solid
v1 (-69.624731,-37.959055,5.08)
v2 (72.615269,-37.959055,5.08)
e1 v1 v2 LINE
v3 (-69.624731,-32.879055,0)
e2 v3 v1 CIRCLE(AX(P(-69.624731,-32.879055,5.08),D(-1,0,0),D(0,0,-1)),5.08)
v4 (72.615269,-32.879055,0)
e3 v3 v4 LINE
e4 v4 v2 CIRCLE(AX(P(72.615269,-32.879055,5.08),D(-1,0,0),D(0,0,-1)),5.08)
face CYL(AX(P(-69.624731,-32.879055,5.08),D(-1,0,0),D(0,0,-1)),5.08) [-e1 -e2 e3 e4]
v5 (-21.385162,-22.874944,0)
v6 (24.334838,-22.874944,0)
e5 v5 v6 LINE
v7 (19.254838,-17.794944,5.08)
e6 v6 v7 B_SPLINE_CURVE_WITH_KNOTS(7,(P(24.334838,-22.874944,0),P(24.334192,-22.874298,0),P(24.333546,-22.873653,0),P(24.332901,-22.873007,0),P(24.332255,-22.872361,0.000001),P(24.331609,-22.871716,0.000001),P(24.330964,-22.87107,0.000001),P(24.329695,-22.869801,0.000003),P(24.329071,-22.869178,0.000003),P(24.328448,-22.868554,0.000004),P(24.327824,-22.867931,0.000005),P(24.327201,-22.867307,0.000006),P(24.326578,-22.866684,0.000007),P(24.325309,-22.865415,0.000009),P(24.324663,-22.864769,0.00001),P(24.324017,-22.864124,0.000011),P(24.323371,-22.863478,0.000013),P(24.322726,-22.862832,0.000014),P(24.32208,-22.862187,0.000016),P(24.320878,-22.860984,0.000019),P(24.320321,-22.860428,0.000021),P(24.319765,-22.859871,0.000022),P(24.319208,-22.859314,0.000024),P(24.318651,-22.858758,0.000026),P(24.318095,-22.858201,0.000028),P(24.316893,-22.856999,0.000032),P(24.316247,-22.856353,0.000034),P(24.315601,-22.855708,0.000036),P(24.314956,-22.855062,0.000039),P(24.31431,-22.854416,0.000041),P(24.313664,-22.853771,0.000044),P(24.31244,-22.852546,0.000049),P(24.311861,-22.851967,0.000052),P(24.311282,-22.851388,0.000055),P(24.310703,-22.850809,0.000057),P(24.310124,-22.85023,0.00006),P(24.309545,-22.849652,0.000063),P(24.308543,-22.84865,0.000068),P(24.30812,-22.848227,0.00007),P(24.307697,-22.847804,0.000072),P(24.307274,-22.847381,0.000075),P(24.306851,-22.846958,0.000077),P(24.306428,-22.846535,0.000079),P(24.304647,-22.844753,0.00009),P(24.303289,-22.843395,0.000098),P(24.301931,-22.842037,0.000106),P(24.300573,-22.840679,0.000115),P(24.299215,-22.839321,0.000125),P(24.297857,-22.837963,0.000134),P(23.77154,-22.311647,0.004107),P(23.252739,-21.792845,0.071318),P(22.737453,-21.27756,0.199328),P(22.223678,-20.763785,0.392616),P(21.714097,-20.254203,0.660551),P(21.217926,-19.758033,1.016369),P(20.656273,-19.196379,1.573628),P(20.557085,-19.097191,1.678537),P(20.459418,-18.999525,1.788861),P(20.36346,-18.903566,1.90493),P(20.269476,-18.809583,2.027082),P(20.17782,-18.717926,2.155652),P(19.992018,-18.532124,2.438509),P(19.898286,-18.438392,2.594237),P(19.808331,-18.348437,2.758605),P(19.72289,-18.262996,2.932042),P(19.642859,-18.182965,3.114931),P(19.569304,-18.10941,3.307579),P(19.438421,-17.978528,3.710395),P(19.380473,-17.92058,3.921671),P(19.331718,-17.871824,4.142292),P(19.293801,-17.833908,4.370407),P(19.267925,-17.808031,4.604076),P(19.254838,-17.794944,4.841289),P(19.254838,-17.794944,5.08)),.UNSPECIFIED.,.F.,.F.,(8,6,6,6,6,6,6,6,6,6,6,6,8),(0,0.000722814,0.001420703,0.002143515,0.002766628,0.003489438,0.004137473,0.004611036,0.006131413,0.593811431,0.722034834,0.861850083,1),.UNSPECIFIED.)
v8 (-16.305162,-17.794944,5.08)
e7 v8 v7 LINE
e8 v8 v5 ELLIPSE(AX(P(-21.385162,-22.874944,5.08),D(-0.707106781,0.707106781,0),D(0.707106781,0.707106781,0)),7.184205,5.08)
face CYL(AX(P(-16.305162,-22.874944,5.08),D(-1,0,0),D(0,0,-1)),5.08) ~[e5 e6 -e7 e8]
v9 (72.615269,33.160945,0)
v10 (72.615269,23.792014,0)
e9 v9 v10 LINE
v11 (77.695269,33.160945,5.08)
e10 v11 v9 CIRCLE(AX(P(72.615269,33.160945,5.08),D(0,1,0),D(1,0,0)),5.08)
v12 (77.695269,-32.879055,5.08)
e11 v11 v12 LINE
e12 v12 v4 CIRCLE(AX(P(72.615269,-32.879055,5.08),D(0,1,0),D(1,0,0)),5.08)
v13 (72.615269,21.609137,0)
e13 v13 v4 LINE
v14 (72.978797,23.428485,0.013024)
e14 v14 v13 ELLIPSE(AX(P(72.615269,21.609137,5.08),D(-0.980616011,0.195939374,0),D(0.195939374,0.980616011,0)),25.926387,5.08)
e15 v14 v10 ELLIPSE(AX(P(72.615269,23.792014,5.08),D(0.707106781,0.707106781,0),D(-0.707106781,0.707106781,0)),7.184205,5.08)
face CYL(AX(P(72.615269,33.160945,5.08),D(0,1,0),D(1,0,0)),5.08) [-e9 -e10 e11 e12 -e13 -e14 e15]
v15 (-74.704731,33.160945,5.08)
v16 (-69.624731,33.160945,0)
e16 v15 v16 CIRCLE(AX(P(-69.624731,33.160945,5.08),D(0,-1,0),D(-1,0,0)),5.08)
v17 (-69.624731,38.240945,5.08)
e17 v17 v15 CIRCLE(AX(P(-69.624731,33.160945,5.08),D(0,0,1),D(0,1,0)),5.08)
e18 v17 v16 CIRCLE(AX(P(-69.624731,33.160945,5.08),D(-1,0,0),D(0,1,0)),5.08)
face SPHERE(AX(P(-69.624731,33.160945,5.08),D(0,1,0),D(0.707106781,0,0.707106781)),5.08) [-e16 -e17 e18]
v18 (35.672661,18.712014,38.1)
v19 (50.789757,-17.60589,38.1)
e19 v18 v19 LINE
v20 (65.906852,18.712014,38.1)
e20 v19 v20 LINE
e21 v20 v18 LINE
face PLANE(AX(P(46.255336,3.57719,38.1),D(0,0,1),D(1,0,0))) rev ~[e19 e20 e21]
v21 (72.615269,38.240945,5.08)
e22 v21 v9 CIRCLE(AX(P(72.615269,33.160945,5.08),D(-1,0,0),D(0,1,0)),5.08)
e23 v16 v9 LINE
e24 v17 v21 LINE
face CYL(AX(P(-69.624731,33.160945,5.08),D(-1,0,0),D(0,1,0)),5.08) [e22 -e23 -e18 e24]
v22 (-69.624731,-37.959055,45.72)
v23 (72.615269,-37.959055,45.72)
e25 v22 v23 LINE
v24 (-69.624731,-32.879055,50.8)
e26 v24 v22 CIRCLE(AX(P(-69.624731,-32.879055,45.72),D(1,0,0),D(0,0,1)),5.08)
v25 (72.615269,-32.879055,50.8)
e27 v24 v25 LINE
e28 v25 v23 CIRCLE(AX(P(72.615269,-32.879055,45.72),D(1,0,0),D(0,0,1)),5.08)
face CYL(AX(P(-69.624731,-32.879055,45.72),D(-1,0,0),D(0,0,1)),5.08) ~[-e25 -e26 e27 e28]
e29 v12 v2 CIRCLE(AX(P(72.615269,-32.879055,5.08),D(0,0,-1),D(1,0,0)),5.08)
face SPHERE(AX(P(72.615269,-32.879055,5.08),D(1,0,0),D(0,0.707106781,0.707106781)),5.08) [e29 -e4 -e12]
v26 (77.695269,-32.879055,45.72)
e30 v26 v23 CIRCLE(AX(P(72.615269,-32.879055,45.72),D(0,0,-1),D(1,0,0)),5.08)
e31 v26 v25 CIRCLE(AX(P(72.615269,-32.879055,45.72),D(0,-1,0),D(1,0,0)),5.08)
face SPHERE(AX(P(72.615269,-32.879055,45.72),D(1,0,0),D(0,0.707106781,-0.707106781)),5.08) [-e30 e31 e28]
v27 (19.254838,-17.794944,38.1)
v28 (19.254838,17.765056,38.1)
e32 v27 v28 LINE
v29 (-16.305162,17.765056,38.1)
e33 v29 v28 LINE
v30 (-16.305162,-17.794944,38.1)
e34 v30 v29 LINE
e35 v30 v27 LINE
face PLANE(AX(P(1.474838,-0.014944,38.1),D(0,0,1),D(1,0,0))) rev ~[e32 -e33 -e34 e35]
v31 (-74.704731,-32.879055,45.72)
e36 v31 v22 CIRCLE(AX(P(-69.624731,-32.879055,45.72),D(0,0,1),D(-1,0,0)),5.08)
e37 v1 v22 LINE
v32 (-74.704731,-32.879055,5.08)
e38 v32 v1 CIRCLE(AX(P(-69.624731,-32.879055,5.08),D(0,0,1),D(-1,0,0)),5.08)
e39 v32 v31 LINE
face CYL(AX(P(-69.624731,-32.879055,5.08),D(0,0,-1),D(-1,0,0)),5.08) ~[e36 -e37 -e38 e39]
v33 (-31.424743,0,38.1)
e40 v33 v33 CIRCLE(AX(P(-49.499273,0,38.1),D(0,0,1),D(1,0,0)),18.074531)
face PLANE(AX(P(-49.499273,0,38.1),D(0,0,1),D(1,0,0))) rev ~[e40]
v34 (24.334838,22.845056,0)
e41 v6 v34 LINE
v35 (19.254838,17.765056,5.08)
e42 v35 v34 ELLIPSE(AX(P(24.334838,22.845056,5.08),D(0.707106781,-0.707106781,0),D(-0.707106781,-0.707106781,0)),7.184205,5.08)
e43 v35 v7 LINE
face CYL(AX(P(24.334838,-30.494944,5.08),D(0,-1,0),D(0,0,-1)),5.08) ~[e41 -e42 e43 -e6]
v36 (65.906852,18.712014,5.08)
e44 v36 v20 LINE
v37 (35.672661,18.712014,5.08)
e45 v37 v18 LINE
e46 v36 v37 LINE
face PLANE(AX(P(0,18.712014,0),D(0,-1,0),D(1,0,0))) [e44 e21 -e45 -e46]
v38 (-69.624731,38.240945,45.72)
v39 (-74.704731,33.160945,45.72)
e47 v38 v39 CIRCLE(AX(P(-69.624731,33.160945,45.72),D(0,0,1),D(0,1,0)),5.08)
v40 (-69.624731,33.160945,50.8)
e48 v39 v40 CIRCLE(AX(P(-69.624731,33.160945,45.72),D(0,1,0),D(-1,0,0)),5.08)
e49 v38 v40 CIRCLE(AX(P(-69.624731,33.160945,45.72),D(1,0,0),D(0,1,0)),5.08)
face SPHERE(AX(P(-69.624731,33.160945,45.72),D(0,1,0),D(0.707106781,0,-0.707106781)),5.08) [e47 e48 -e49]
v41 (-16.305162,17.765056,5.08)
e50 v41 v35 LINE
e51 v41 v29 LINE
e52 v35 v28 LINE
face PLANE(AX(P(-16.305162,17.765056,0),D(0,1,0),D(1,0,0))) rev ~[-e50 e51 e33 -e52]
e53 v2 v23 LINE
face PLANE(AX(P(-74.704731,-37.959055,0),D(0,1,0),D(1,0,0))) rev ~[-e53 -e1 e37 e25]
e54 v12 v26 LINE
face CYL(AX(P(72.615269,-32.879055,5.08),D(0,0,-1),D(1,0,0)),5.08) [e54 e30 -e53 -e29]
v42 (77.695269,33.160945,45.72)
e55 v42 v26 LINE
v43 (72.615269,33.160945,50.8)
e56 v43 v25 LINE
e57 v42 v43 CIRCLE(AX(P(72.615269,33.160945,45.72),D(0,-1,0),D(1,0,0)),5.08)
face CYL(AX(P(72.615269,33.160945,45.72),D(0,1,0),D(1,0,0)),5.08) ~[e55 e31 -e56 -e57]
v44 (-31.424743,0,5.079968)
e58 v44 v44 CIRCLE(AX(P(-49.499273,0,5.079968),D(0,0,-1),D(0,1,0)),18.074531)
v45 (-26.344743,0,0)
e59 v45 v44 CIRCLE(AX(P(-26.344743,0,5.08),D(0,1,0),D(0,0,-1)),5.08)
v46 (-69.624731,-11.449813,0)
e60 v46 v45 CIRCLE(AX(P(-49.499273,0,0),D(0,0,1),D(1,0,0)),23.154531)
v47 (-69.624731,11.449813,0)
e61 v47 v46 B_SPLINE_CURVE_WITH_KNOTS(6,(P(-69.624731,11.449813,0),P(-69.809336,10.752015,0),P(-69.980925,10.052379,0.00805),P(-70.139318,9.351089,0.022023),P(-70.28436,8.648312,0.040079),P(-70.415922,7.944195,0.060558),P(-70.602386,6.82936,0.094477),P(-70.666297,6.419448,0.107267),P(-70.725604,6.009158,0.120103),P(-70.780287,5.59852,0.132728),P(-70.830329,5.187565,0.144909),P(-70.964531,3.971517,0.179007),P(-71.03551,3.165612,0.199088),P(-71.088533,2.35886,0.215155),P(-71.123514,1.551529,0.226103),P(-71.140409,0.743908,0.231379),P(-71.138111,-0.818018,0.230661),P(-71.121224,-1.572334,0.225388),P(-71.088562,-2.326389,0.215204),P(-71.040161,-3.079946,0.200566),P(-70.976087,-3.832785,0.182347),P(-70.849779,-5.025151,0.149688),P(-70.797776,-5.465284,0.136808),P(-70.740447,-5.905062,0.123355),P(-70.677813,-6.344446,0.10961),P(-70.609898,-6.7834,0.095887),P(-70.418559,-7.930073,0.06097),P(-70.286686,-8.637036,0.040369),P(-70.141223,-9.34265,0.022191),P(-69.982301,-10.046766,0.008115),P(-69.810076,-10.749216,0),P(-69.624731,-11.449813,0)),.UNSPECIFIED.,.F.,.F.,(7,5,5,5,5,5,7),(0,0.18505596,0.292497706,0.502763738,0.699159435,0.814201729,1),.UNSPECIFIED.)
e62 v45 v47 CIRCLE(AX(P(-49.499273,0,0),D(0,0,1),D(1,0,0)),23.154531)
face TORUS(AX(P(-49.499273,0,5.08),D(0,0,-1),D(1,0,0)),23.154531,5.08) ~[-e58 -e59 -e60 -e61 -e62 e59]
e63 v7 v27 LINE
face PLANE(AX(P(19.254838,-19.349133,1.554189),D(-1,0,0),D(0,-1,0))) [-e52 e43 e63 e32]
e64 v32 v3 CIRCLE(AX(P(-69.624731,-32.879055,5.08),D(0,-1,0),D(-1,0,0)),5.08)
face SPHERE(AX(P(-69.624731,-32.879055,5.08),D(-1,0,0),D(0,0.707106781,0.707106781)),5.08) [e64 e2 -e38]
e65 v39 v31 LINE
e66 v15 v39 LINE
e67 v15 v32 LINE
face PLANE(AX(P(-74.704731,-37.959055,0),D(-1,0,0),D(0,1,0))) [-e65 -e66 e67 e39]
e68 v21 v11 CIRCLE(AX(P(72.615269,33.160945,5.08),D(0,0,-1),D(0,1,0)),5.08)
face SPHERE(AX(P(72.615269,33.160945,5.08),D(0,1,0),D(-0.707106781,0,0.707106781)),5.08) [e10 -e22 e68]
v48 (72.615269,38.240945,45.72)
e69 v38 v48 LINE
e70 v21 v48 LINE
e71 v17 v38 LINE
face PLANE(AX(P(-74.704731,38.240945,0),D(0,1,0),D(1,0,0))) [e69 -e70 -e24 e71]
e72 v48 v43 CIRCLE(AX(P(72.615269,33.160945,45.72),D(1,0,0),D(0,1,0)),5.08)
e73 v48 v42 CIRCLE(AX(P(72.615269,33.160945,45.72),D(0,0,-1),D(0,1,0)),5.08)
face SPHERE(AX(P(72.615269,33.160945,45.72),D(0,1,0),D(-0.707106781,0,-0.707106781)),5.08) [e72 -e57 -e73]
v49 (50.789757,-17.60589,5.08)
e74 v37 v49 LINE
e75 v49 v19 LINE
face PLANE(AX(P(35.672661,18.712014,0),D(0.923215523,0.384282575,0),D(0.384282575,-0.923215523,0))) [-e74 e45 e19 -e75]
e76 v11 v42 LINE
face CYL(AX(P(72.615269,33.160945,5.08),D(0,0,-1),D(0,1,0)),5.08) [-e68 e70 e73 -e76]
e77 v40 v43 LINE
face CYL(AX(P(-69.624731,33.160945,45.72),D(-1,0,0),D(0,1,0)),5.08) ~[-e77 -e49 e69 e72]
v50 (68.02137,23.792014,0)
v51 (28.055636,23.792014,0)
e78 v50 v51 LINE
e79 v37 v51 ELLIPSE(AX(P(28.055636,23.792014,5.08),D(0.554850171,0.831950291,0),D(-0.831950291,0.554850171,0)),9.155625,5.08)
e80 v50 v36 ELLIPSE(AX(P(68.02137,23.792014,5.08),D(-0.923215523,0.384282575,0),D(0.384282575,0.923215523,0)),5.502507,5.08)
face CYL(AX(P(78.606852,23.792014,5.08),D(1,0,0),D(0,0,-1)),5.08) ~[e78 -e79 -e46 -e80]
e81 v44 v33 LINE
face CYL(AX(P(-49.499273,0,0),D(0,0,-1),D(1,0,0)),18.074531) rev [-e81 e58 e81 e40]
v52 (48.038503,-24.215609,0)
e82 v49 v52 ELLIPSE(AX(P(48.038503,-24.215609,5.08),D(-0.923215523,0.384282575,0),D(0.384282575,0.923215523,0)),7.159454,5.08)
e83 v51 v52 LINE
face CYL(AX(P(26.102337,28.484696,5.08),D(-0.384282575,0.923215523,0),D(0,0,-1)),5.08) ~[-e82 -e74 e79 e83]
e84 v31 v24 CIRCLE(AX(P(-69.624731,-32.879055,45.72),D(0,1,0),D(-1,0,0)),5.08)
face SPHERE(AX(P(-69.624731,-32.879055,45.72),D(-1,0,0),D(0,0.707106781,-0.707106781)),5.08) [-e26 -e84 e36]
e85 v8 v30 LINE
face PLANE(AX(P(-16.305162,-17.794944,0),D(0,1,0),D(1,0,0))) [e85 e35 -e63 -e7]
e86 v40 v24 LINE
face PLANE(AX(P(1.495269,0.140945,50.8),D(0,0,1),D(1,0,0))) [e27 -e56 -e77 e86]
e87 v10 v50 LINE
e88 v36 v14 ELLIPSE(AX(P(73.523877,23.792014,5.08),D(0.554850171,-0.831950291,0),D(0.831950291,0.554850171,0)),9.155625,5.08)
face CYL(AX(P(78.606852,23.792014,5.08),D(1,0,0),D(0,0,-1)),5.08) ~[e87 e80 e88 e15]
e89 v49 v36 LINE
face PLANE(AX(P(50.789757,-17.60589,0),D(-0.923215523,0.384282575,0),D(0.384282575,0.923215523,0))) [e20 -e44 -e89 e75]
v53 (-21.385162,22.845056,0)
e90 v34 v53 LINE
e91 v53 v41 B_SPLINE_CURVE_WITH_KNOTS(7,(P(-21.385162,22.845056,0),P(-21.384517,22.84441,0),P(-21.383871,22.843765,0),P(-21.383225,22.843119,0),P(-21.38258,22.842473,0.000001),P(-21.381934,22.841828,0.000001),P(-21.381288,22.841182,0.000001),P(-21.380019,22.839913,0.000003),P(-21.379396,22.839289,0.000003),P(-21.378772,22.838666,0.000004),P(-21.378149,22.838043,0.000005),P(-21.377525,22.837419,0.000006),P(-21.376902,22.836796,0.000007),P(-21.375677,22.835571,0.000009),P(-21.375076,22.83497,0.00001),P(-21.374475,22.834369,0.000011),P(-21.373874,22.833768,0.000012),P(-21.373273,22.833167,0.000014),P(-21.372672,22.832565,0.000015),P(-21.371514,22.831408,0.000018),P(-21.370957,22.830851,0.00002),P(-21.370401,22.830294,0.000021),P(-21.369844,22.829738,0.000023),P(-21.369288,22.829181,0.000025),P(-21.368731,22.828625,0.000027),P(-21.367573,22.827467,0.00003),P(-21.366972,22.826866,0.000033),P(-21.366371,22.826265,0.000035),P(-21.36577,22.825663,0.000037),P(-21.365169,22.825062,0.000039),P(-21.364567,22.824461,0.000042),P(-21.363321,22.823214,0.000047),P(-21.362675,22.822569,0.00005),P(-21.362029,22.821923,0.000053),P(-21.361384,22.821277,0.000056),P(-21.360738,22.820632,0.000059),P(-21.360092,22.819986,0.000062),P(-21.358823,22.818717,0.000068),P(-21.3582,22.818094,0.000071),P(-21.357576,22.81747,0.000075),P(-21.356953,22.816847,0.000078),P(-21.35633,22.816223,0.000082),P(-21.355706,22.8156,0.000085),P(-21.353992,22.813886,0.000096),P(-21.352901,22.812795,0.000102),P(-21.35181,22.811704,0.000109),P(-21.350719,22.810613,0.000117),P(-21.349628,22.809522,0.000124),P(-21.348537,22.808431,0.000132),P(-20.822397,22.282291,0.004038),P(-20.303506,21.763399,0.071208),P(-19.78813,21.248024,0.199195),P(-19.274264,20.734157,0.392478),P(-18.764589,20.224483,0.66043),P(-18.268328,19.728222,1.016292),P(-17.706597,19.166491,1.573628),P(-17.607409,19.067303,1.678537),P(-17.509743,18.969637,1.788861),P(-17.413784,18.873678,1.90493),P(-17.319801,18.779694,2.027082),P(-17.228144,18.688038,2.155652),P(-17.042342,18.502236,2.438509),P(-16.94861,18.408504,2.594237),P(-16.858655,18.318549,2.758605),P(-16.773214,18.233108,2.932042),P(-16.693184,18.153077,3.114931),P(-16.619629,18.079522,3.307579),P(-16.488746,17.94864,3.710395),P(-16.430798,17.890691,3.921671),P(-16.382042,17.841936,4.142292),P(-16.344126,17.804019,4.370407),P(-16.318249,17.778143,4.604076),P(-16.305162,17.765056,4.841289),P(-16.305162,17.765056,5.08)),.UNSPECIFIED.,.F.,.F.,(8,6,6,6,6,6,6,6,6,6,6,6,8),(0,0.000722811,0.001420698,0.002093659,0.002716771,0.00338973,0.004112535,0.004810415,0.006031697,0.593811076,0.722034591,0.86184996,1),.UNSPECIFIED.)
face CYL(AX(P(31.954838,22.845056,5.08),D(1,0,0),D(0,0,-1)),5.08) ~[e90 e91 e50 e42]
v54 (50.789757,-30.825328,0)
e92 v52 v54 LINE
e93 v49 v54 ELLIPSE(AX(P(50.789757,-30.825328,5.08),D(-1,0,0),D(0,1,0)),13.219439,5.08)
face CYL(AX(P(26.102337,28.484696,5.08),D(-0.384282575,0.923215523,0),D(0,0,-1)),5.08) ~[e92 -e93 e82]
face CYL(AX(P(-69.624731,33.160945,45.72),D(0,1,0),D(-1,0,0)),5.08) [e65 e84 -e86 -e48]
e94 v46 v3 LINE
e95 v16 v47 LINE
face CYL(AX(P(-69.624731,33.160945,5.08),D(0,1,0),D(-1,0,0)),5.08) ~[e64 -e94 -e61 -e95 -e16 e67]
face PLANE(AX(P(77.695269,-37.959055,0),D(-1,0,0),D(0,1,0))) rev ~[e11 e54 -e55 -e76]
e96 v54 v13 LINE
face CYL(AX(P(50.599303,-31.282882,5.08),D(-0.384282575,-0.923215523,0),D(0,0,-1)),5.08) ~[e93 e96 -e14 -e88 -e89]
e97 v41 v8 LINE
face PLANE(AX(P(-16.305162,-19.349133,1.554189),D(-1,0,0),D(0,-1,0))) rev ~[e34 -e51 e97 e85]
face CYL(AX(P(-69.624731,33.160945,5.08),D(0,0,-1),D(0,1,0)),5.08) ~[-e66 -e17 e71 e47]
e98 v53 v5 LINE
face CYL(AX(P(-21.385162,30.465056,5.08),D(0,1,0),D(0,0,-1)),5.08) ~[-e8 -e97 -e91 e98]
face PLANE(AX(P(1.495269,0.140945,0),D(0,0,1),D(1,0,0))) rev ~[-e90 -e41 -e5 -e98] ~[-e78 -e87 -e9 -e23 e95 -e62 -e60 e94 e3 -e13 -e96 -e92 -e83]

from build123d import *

# Parameters (mm, degrees)
F0_W          = 152.4
F0_H          = 76.2
F1_DEPTH      = 50.8
F2_R          = 18.0745305817
F3_DEPTH      = 38.1
F6_DEPTH      = 38.1
F4_W          = 35.56
F4_H          = 35.56
F7_DEPTH      = 38.1
F8_T1_DEPTH   = 35.56
F8_T3_DEPTH   = 35.56
F8_T5_DEPTH   = 142.24
F8_T7_DEPTH   = 66.04
F8_T9_DEPTH   = 40.64
F8_S13_W      = 5.08
F8_S13_H      = 5.08
F8_T14_DEPTH  = 5.08
F8_S19_W      = 5.08
F8_S19_H      = 5.08
F8_T20_DEPTH  = 5.08
F8_S25_W      = 5.08
F8_S25_H      = 5.08
F8_T26_DEPTH  = 5.08
F8_S31_W      = 5.08
F8_S31_H      = 5.08
F8_T32_DEPTH  = 5.08
F8_S37_W      = 5.08
F8_S37_H      = 5.08
F8_T38_DEPTH  = 5.08
F8_S43_W      = 5.08
F8_S43_H      = 5.08
F8_T44_DEPTH  = 5.08
F8_S49_W      = 5.08
F8_S49_H      = 5.08
F8_T50_DEPTH  = 5.08
F8_S55_W      = 5.08
F8_S55_H      = 5.08
F8_T56_DEPTH  = 5.08
F8_T64_DEPTH  = 64.7384888256
F8_T70_DEPTH  = 64.7384888256
F8_T76_DEPTH  = 55.6341915667
F8_T83_DEPTH  = 48.26
F8_T87_DEPTH  = 48.26
F8_T94_DEPTH  = 48.26
F8_T98_DEPTH  = 48.26
F8_T105_DEPTH = 48.26
F8_T109_DEPTH = 48.26
F8_T116_DEPTH = 48.26
F8_T120_DEPTH = 48.26
F8_T127_DEPTH = 64.7384888256
F8_T131_DEPTH = 55.6341915667
F8_T138_DEPTH = 64.7384888256
F8_T142_DEPTH = 64.7384888256
F8_T149_DEPTH = 55.6341915667
F8_T153_DEPTH = 64.7384888256


# Not quite as in the source:
# - a fillet or chamfer that OpenCascade refuses, or shapes differently, is made with other operations: its cross-section is extruded or revolved along the edge and cut away or added


with BuildPart() as f1:
    # F0 (on Top) → F1 (new body)
    with BuildSketch(Plane.XY):
        with Locations((1.4952687383, 0.1409448402)):
            Rectangle(F0_W, F0_H)
    extrude(amount=F1_DEPTH)

    # F2 (on Top) → F3 (cut)
    with BuildSketch(Plane.XY):
        with Locations((-49.4992733002, 0)):
            Circle(F2_R)
    extrude(amount=F3_DEPTH, mode=Mode.SUBTRACT)

    # F5 (on Top) → F6 (cut)
    with BuildSketch(Plane.XY):
        Polygon((50.7897567004, 18.7120139599), (35.672660917, 18.7120139599), (50.7897567004, -17.6058895886), align=None)
        Polygon((65.9068524837, 18.7120139599), (50.7897567004, 18.7120139599), (50.7897567004, -17.6058895886), align=None)
    extrude(amount=F6_DEPTH, mode=Mode.SUBTRACT)

    # F4 (on Top) → F7 (cut)
    with BuildSketch(Plane.XY):
        with Locations((1.4748377725, -0.014944126)):
            Rectangle(F4_W, F4_H)
    extrude(amount=F7_DEPTH, mode=Mode.SUBTRACT)

    # F8: fillet of radius 5.08 on 20 edges, made by hand

    # F8_s2 → F8_t1 (cut)
    with BuildSketch(Plane.YZ.offset(-16.3051622275)):
        with BuildLine():
            ThreePointArc((-22.874944126, 0), (-19.2828416775, 1.4878975516), (-17.794944126, 5.08))
            Line((-17.794944126, 5.08), (-17.794944126, 0))
            Line((-17.794944126, 0), (-22.874944126, 0))
        make_face()
        with BuildLine():
            ThreePointArc((22.845055874, 0), (19.2529534256, 1.4878975516), (17.765055874, 5.08))
            Line((17.765055874, 5.08), (17.765055874, 0))
            Line((17.765055874, 0), (22.845055874, 0))
        make_face()
    extrude(amount=F8_T1_DEPTH, mode=Mode.SUBTRACT)

    # F8_s4 → F8_t3 (cut)
    with BuildSketch(Plane.XZ.offset(-17.765055874)):
        with BuildLine():
            ThreePointArc((-21.3851622275, 0), (-17.793059779, 1.4878975516), (-16.3051622275, 5.08))
            Line((-16.3051622275, 5.08), (-16.3051622275, 0))
            Line((-16.3051622275, 0), (-21.3851622275, 0))
        make_face()
        with BuildLine():
            ThreePointArc((24.3348377725, 0), (20.7427353241, 1.4878975516), (19.2548377725, 5.08))
            Line((19.2548377725, 5.08), (19.2548377725, 0))
            Line((19.2548377725, 0), (24.3348377725, 0))
        make_face()
    extrude(amount=F8_T3_DEPTH, mode=Mode.SUBTRACT)

    # F8_s6 → F8_t5 (cut)
    with BuildSketch(Plane.YZ.offset(-69.6247312617)):
        with BuildLine():
            ThreePointArc((38.2409448402, 5.08), (36.7530472886, 1.4878975516), (33.1609448402, 0))
            Line((33.1609448402, 0), (38.2409448402, 0))
            Line((38.2409448402, 0), (38.2409448402, 5.08))
        make_face()
        with BuildLine():
            ThreePointArc((-32.8790551598, 0), (-36.4711576083, 1.4878975516), (-37.9590551598, 5.08))
            Line((-37.9590551598, 5.08), (-37.9590551598, 0))
            Line((-37.9590551598, 0), (-32.8790551598, 0))
        make_face()
        with BuildLine():
            ThreePointArc((38.2409448402, 45.72), (36.7530472886, 49.3121024484), (33.1609448402, 50.8))
            Line((33.1609448402, 50.8), (38.2409448402, 50.8))
            Line((38.2409448402, 50.8), (38.2409448402, 45.72))
        make_face()
        with BuildLine():
            ThreePointArc((-32.8790551598, 50.8), (-36.4711576083, 49.3121024484), (-37.9590551598, 45.72))
            Line((-37.9590551598, 45.72), (-37.9590551598, 50.8))
            Line((-37.9590551598, 50.8), (-32.8790551598, 50.8))
        make_face()
    extrude(amount=F8_T5_DEPTH, mode=Mode.SUBTRACT)

    # F8_s8 → F8_t7 (cut)
    with BuildSketch(Plane.XZ.offset(-33.1609448402)):
        with BuildLine():
            ThreePointArc((77.6952687383, 5.08), (76.2073711867, 1.4878975516), (72.6152687383, 0))
            Line((72.6152687383, 0), (77.6952687383, 0))
            Line((77.6952687383, 0), (77.6952687383, 5.08))
        make_face()
        with BuildLine():
            ThreePointArc((-74.7047312617, 5.08), (-73.2168337102, 1.4878975516), (-69.6247312617, 0))
            Line((-69.6247312617, 0), (-74.7047312617, 0))
            Line((-74.7047312617, 0), (-74.7047312617, 5.08))
        make_face()
        with BuildLine():
            ThreePointArc((-74.7047312617, 45.72), (-73.2168337102, 49.3121024484), (-69.6247312617, 50.8))
            Line((-69.6247312617, 50.8), (-74.7047312617, 50.8))
            Line((-74.7047312617, 50.8), (-74.7047312617, 45.72))
        make_face()
        with BuildLine():
            ThreePointArc((77.6952687383, 45.72), (76.2073711867, 49.3121024484), (72.6152687383, 50.8))
            Line((72.6152687383, 50.8), (77.6952687383, 50.8))
            Line((77.6952687383, 50.8), (77.6952687383, 45.72))
        make_face()
    extrude(amount=F8_T7_DEPTH, mode=Mode.SUBTRACT)

    # F8_s10 → F8_t9 (cut)
    with BuildSketch(Plane.XY.offset(5.08)):
        with BuildLine():
            ThreePointArc((72.6152687383, 38.2409448402), (76.2073711867, 36.7530472886), (77.6952687383, 33.1609448402))
            Line((77.6952687383, 33.1609448402), (77.6952687383, 38.2409448402))
            Line((77.6952687383, 38.2409448402), (72.6152687383, 38.2409448402))
        make_face()
        with BuildLine():
            ThreePointArc((77.6952687383, -32.8790551598), (76.2073711867, -36.4711576083), (72.6152687383, -37.9590551598))
            Line((72.6152687383, -37.9590551598), (77.6952687383, -37.9590551598))
            Line((77.6952687383, -37.9590551598), (77.6952687383, -32.8790551598))
        make_face()
        with BuildLine():
            ThreePointArc((-74.7047312617, -32.8790551598), (-73.2168337102, -36.4711576083), (-69.6247312617, -37.9590551598))
            Line((-69.6247312617, -37.9590551598), (-74.7047312617, -37.9590551598))
            Line((-74.7047312617, -37.9590551598), (-74.7047312617, -32.8790551598))
        make_face()
        with BuildLine():
            ThreePointArc((-69.6247312617, 38.2409448402), (-73.2168337102, 36.7530472886), (-74.7047312617, 33.1609448402))
            Line((-74.7047312617, 33.1609448402), (-74.7047312617, 38.2409448402))
            Line((-74.7047312617, 38.2409448402), (-69.6247312617, 38.2409448402))
        make_face()
    extrude(amount=F8_T9_DEPTH, mode=Mode.SUBTRACT)


with BuildPart() as f8_tool12:
    # F8_s13 → F8_t14 (new body)
    with BuildSketch(Plane.XZ.offset(-33.1609448402)):
        with Locations((75.1552687383, 2.54)):
            Rectangle(F8_S13_W, F8_S13_H)
    extrude(amount=-F8_T14_DEPTH)

    # F8_s15 → F8_t16 (revolve, cut)
    with BuildSketch(Plane(origin=(72.6152687383, 33.1609448402, 5.08), x_dir=(-0.7071067812, 0, 0.7071067812), z_dir=(-0.7071067812, 0, -0.7071067812))):
        with BuildLine():
            ThreePointArc((0, -5.08), (5.08, 0), (0, 5.08))
            Line((0, 5.08), (0, -5.08))
        make_face()
    revolve(axis=Axis((72.6152687383, 33.1609448402, 5.08), (0, 1, 0)), mode=Mode.SUBTRACT)


with BuildPart() as f1_1:
    add(f1.part)

    # F8_t11: cut F8_tool12
    add(f8_tool12.part, mode=Mode.SUBTRACT)


with BuildPart() as f8_tool18:
    # F8_s19 → F8_t20 (new body)
    with BuildSketch(Plane.XZ.offset(-33.1609448402)):
        with Locations((-72.1647312617, 2.54)):
            Rectangle(F8_S19_W, F8_S19_H)
    extrude(amount=-F8_T20_DEPTH)

    # F8_s21 → F8_t22 (revolve, cut)
    with BuildSketch(Plane(origin=(-69.6247312617, 33.1609448402, 5.08), x_dir=(0.7071067812, 0, 0.7071067812), z_dir=(-0.7071067812, 0, 0.7071067812))):
        with BuildLine():
            ThreePointArc((0, -5.08), (5.08, 0), (0, 5.08))
            Line((0, 5.08), (0, -5.08))
        make_face()
    revolve(axis=Axis((-69.6247312617, 33.1609448402, 5.08), (0, 1, 0)), mode=Mode.SUBTRACT)


with BuildPart() as f1_2:
    add(f1_1.part)

    # F8_t17: cut F8_tool18
    add(f8_tool18.part, mode=Mode.SUBTRACT)


with BuildPart() as f8_tool24:
    # F8_s25 → F8_t26 (new body)
    with BuildSketch(Plane.YZ.offset(72.6152687383)):
        with Locations((-35.4190551598, 2.54)):
            Rectangle(F8_S25_W, F8_S25_H)
    extrude(amount=F8_T26_DEPTH)

    # F8_s27 → F8_t28 (revolve, cut)
    with BuildSketch(Plane(origin=(72.6152687383, -32.8790551598, 5.08), x_dir=(0, 0.7071067812, 0.7071067812), z_dir=(0, 0.7071067812, -0.7071067812))):
        with BuildLine():
            ThreePointArc((0, -5.08), (5.08, 0), (0, 5.08))
            Line((0, 5.08), (0, -5.08))
        make_face()
    revolve(axis=Axis((72.6152687383, -32.8790551598, 5.08), (1, 0, 0)), mode=Mode.SUBTRACT)


with BuildPart() as f1_3:
    add(f1_2.part)

    # F8_t23: cut F8_tool24
    add(f8_tool24.part, mode=Mode.SUBTRACT)


with BuildPart() as f8_tool30:
    # F8_s31 → F8_t32 (new body)
    with BuildSketch(Plane.YZ.offset(-69.6247312617)):
        with Locations((-35.4190551598, 2.54)):
            Rectangle(F8_S31_W, F8_S31_H)
    extrude(amount=-F8_T32_DEPTH)

    # F8_s33 → F8_t34 (revolve, cut)
    with BuildSketch(Plane(origin=(-69.6247312617, -32.8790551598, 5.08), x_dir=(0, 0.7071067812, 0.7071067812), z_dir=(0, -0.7071067812, 0.7071067812))):
        with BuildLine():
            ThreePointArc((0, -5.08), (5.08, 0), (0, 5.08))
            Line((0, 5.08), (0, -5.08))
        make_face()
    revolve(axis=Axis((-69.6247312617, -32.8790551598, 5.08), (-1, 0, 0)), mode=Mode.SUBTRACT)


with BuildPart() as f1_4:
    add(f1_3.part)

    # F8_t29: cut F8_tool30
    add(f8_tool30.part, mode=Mode.SUBTRACT)


with BuildPart() as f8_tool36:
    # F8_s37 → F8_t38 (new body)
    with BuildSketch(Plane.XZ.offset(-33.1609448402)):
        with Locations((75.1552687383, 48.26)):
            Rectangle(F8_S37_W, F8_S37_H)
    extrude(amount=-F8_T38_DEPTH)

    # F8_s39 → F8_t40 (revolve, cut)
    with BuildSketch(Plane(origin=(72.6152687383, 33.1609448402, 45.72), x_dir=(-0.7071067812, 0, -0.7071067812), z_dir=(0.7071067812, 0, -0.7071067812))):
        with BuildLine():
            ThreePointArc((0, -5.08), (5.08, 0), (0, 5.08))
            Line((0, 5.08), (0, -5.08))
        make_face()
    revolve(axis=Axis((72.6152687383, 33.1609448402, 45.72), (0, 1, 0)), mode=Mode.SUBTRACT)


with BuildPart() as f1_5:
    add(f1_4.part)

    # F8_t35: cut F8_tool36
    add(f8_tool36.part, mode=Mode.SUBTRACT)


with BuildPart() as f8_tool42:
    # F8_s43 → F8_t44 (new body)
    with BuildSketch(Plane.YZ.offset(72.6152687383)):
        with Locations((-35.4190551598, 48.26)):
            Rectangle(F8_S43_W, F8_S43_H)
    extrude(amount=F8_T44_DEPTH)

    # F8_s45 → F8_t46 (revolve, cut)
    with BuildSketch(Plane(origin=(72.6152687383, -32.8790551598, 45.72), x_dir=(0, 0.7071067812, -0.7071067812), z_dir=(0, -0.7071067812, -0.7071067812))):
        with BuildLine():
            ThreePointArc((0, -5.08), (5.08, 0), (0, 5.08))
            Line((0, 5.08), (0, -5.08))
        make_face()
    revolve(axis=Axis((72.6152687383, -32.8790551598, 45.72), (1, 0, 0)), mode=Mode.SUBTRACT)


with BuildPart() as f1_6:
    add(f1_5.part)

    # F8_t41: cut F8_tool42
    add(f8_tool42.part, mode=Mode.SUBTRACT)


with BuildPart() as f8_tool48:
    # F8_s49 → F8_t50 (new body)
    with BuildSketch(Plane.YZ.offset(-69.6247312617)):
        with Locations((-35.4190551598, 48.26)):
            Rectangle(F8_S49_W, F8_S49_H)
    extrude(amount=-F8_T50_DEPTH)

    # F8_s51 → F8_t52 (revolve, cut)
    with BuildSketch(Plane(origin=(-69.6247312617, -32.8790551598, 45.72), x_dir=(0, 0.7071067812, -0.7071067812), z_dir=(0, 0.7071067812, 0.7071067812))):
        with BuildLine():
            ThreePointArc((0, -5.08), (5.08, 0), (0, 5.08))
            Line((0, 5.08), (0, -5.08))
        make_face()
    revolve(axis=Axis((-69.6247312617, -32.8790551598, 45.72), (-1, 0, 0)), mode=Mode.SUBTRACT)


with BuildPart() as f1_7:
    add(f1_6.part)

    # F8_t47: cut F8_tool48
    add(f8_tool48.part, mode=Mode.SUBTRACT)


with BuildPart() as f8_tool54:
    # F8_s55 → F8_t56 (new body)
    with BuildSketch(Plane.XZ.offset(-33.1609448402)):
        with Locations((-72.1647312617, 48.26)):
            Rectangle(F8_S55_W, F8_S55_H)
    extrude(amount=-F8_T56_DEPTH)

    # F8_s57 → F8_t58 (revolve, cut)
    with BuildSketch(Plane(origin=(-69.6247312617, 33.1609448402, 45.72), x_dir=(0.7071067812, 0, -0.7071067812), z_dir=(0.7071067812, 0, 0.7071067812))):
        with BuildLine():
            ThreePointArc((0, -5.08), (5.08, 0), (0, 5.08))
            Line((0, 5.08), (0, -5.08))
        make_face()
    revolve(axis=Axis((-69.6247312617, 33.1609448402, 45.72), (0, 1, 0)), mode=Mode.SUBTRACT)


with BuildPart() as f1_8:
    add(f1_7.part)

    # F8_t53: cut F8_tool54
    add(f8_tool54.part, mode=Mode.SUBTRACT)

    # F8_s59 → F8_t60 (revolve, cut)
    with BuildSketch(Plane.XZ):
        with BuildLine():
            ThreePointArc((-26.3447427184, 0), (-29.9368451669, 1.4878975516), (-31.4247427184, 5.08))
            Line((-31.4247427184, 5.08), (-31.4247427184, 0))
            Line((-31.4247427184, 0), (-26.3447427184, 0))
        make_face()
    revolve(axis=Axis((-49.4992733002, 0, 0), (0, 0, 1)), mode=Mode.SUBTRACT)


with BuildPart() as f8_tool62:
    # F8_s63 → F8_t64 (new body)
    with BuildSketch(Plane(origin=(-6.2510630726, 15.0177989873, 0), x_dir=(0, 0, 1), z_dir=(0.384282575, -0.9232155233, 0))):
        with BuildLine():
            ThreePointArc((0, -35.0442552258), (1.4878975516, -38.6363576742), (5.08, -40.1242552258))
            Line((5.08, -40.1242552258), (0, -40.1242552258))
            Line((0, -40.1242552258), (0, -35.0442552258))
        make_face()
    extrude(amount=F8_T64_DEPTH)

    split(bisect_by=Plane.XZ.offset(-18.7120139599), keep=Keep.TOP)

    split(bisect_by=Plane(origin=(49.535616731, -20.6188846174, 0), x_dir=(0, 0, 1), z_dir=(-0.9232155233, 0.384282575, 0)), keep=Keep.TOP)


with BuildPart() as f1_9:
    add(f1_8.part)

    # F8_t61: cut F8_tool62
    add(f8_tool62.part, mode=Mode.SUBTRACT)


with BuildPart() as f8_tool68:
    # F8_s69 → F8_t70 (new body)
    with BuildSketch(Plane(origin=(-3.6262487334, -8.7118421177, 0), x_dir=(0, 0, 1), z_dir=(0.384282575, 0.9232155233, 0))):
        with BuildLine():
            ThreePointArc((0, 58.7355283991), (1.4878975516, 55.1434259507), (5.08, 53.6555283991))
            Line((5.08, 53.6555283991), (0, 53.6555283991))
            Line((0, 53.6555283991), (0, 58.7355283991))
        make_face()
    extrude(amount=F8_T70_DEPTH)

    split(bisect_by=Plane(origin=(37.0433352869, 15.419052119, 0), x_dir=(0, 0, 1), z_dir=(0.9232155233, 0.384282575, 0)), keep=Keep.TOP)

    split(bisect_by=Plane.XZ.offset(-18.7120139599), keep=Keep.TOP)


with BuildPart() as f1_10:
    add(f1_9.part)

    # F8_t67: cut F8_tool68
    add(f8_tool68.part, mode=Mode.SUBTRACT)


with BuildPart() as f8_tool74:
    # F8_s75 → F8_t76 (new body)
    with BuildSketch(Plane.YZ.offset(78.6068524837)):
        with BuildLine():
            ThreePointArc((23.7920139599, 0), (20.1999115115, 1.4878975516), (18.7120139599, 5.08))
            Line((18.7120139599, 5.08), (18.7120139599, 0))
            Line((18.7120139599, 0), (23.7920139599, 0))
        make_face()
    extrude(amount=-F8_T76_DEPTH)

    split(bisect_by=Plane(origin=(37.0433352869, 15.419052119, 0), x_dir=(0, 0, 1), z_dir=(0.9232155233, 0.384282575, 0)), keep=Keep.TOP)

    split(bisect_by=Plane(origin=(49.535616731, -20.6188846174, 0), x_dir=(0, 0, 1), z_dir=(-0.9232155233, 0.384282575, 0)), keep=Keep.TOP)


with BuildPart() as f1_11:
    add(f1_10.part)

    # F8_t73: cut F8_tool74
    add(f8_tool74.part, mode=Mode.SUBTRACT)


with BuildPart() as f8_tool81:
    # F8_s82 → F8_t83 (new body)
    with BuildSketch(Plane.XZ.offset(-17.765055874)):
        with BuildLine():
            ThreePointArc((-21.3851622275, 0), (-17.793059779, 1.4878975516), (-16.3051622275, 5.08))
            Line((-16.3051622275, 5.08), (-16.3051622275, 0))
            Line((-16.3051622275, 0), (-21.3851622275, 0))
        make_face()
    extrude(amount=F8_T83_DEPTH)

    split(bisect_by=Plane.XZ.offset(17.794944126), keep=Keep.TOP)


with BuildPart() as f8_tool85:
    # F8_s86 → F8_t87 (new body)
    with BuildSketch(Plane.YZ.offset(-29.0051622275)):
        with BuildLine():
            ThreePointArc((-22.874944126, 0), (-19.2828416775, 1.4878975516), (-17.794944126, 5.08))
            Line((-17.794944126, 5.08), (-17.794944126, 0))
            Line((-17.794944126, 0), (-22.874944126, 0))
        make_face()
    extrude(amount=F8_T87_DEPTH)

    split(bisect_by=Plane.YZ.offset(-16.3051622275), keep=Keep.BOTTOM)


with BuildPart() as f8_tool81_1:
    add(f8_tool81.part)

    # F8_t89: intersect F8_tool85
    add(f8_tool85.part, mode=Mode.INTERSECT)


with BuildPart() as f1_12:
    add(f1_11.part)

    # F8_t79: cut F8_tool81
    add(f8_tool81_1.part, mode=Mode.SUBTRACT)


with BuildPart() as f8_tool92:
    # F8_s93 → F8_t94 (new body)
    with BuildSketch(Plane.YZ.offset(-16.3051622275)):
        with BuildLine():
            ThreePointArc((-22.874944126, 0), (-19.2828416775, 1.4878975516), (-17.794944126, 5.08))
            Line((-17.794944126, 5.08), (-17.794944126, 0))
            Line((-17.794944126, 0), (-22.874944126, 0))
        make_face()
    extrude(amount=F8_T94_DEPTH)

    split(bisect_by=Plane.YZ.offset(19.2548377725), keep=Keep.TOP)


with BuildPart() as f8_tool96:
    # F8_s97 → F8_t98 (new body)
    with BuildSketch(Plane.XZ.offset(30.494944126)):
        with BuildLine():
            ThreePointArc((24.3348377725, 0), (20.7427353241, 1.4878975516), (19.2548377725, 5.08))
            Line((19.2548377725, 5.08), (19.2548377725, 0))
            Line((19.2548377725, 0), (24.3348377725, 0))
        make_face()
    extrude(amount=-F8_T98_DEPTH)

    split(bisect_by=Plane.XZ.offset(17.794944126), keep=Keep.TOP)


with BuildPart() as f8_tool92_1:
    add(f8_tool92.part)

    # F8_t100: intersect F8_tool96
    add(f8_tool96.part, mode=Mode.INTERSECT)


with BuildPart() as f1_13:
    add(f1_12.part)

    # F8_t90: cut F8_tool92
    add(f8_tool92_1.part, mode=Mode.SUBTRACT)


with BuildPart() as f8_tool103:
    # F8_s104 → F8_t105 (new body)
    with BuildSketch(Plane.XZ.offset(-30.465055874)):
        with BuildLine():
            ThreePointArc((-21.3851622275, 0), (-17.793059779, 1.4878975516), (-16.3051622275, 5.08))
            Line((-16.3051622275, 5.08), (-16.3051622275, 0))
            Line((-16.3051622275, 0), (-21.3851622275, 0))
        make_face()
    extrude(amount=F8_T105_DEPTH)

    split(bisect_by=Plane.XZ.offset(-17.765055874), keep=Keep.BOTTOM)


with BuildPart() as f8_tool107:
    # F8_s108 → F8_t109 (new body)
    with BuildSketch(Plane.YZ.offset(19.2548377725)):
        with BuildLine():
            ThreePointArc((22.845055874, 0), (19.2529534256, 1.4878975516), (17.765055874, 5.08))
            Line((17.765055874, 5.08), (17.765055874, 0))
            Line((17.765055874, 0), (22.845055874, 0))
        make_face()
    extrude(amount=-F8_T109_DEPTH)

    split(bisect_by=Plane.YZ.offset(-16.3051622275), keep=Keep.BOTTOM)


with BuildPart() as f8_tool103_1:
    add(f8_tool103.part)

    # F8_t111: intersect F8_tool107
    add(f8_tool107.part, mode=Mode.INTERSECT)


with BuildPart() as f1_14:
    add(f1_13.part)

    # F8_t101: cut F8_tool103
    add(f8_tool103_1.part, mode=Mode.SUBTRACT)


with BuildPart() as f8_tool114:
    # F8_s115 → F8_t116 (new body)
    with BuildSketch(Plane.XZ.offset(17.794944126)):
        with BuildLine():
            ThreePointArc((24.3348377725, 0), (20.7427353241, 1.4878975516), (19.2548377725, 5.08))
            Line((19.2548377725, 5.08), (19.2548377725, 0))
            Line((19.2548377725, 0), (24.3348377725, 0))
        make_face()
    extrude(amount=-F8_T116_DEPTH)

    split(bisect_by=Plane.XZ.offset(-17.765055874), keep=Keep.BOTTOM)


with BuildPart() as f8_tool118:
    # F8_s119 → F8_t120 (new body)
    with BuildSketch(Plane.YZ.offset(31.9548377725)):
        with BuildLine():
            ThreePointArc((22.845055874, 0), (19.2529534256, 1.4878975516), (17.765055874, 5.08))
            Line((17.765055874, 5.08), (17.765055874, 0))
            Line((17.765055874, 0), (22.845055874, 0))
        make_face()
    extrude(amount=-F8_T120_DEPTH)

    split(bisect_by=Plane.YZ.offset(19.2548377725), keep=Keep.TOP)


with BuildPart() as f8_tool114_1:
    add(f8_tool114.part)

    # F8_t122: intersect F8_tool118
    add(f8_tool118.part, mode=Mode.INTERSECT)


with BuildPart() as f1_15:
    add(f1_14.part)

    # F8_t112: cut F8_tool114
    add(f8_tool114_1.part, mode=Mode.SUBTRACT)


with BuildPart() as f8_tool125:
    # F8_s126 → F8_t127 (new body)
    with BuildSketch(Plane(origin=(-6.2510630726, 15.0177989873, 0), x_dir=(0, 0, 1), z_dir=(0.384282575, -0.9232155233, 0))):
        with BuildLine():
            ThreePointArc((0, -35.0442552258), (1.4878975516, -38.6363576742), (5.08, -40.1242552258))
            Line((5.08, -40.1242552258), (0, -40.1242552258))
            Line((0, -40.1242552258), (0, -35.0442552258))
        make_face()
    extrude(amount=F8_T127_DEPTH)

    split(bisect_by=Plane.XZ.offset(-18.7120139599), keep=Keep.BOTTOM)


with BuildPart() as f8_tool129:
    # F8_s130 → F8_t131 (new body)
    with BuildSketch(Plane.YZ.offset(78.6068524837)):
        with BuildLine():
            ThreePointArc((23.7920139599, 0), (20.1999115115, 1.4878975516), (18.7120139599, 5.08))
            Line((18.7120139599, 5.08), (18.7120139599, 0))
            Line((18.7120139599, 0), (23.7920139599, 0))
        make_face()
    extrude(amount=-F8_T131_DEPTH)

    split(bisect_by=Plane(origin=(37.0433352869, 15.419052119, 0), x_dir=(0, 0, 1), z_dir=(-0.9232155233, -0.384282575, 0)), keep=Keep.TOP)


with BuildPart() as f8_tool125_1:
    add(f8_tool125.part)

    # F8_t133: intersect F8_tool129
    add(f8_tool129.part, mode=Mode.INTERSECT)


with BuildPart() as f1_16:
    add(f1_15.part)

    # F8_t123: cut F8_tool125
    add(f8_tool125_1.part, mode=Mode.SUBTRACT)


with BuildPart() as f8_tool136:
    # F8_s137 → F8_t138 (new body)
    with BuildSketch(Plane(origin=(-6.2510630726, 15.0177989873, 0), x_dir=(0, 0, 1), z_dir=(0.384282575, -0.9232155233, 0))):
        with BuildLine():
            ThreePointArc((0, -35.0442552258), (1.4878975516, -38.6363576742), (5.08, -40.1242552258))
            Line((5.08, -40.1242552258), (0, -40.1242552258))
            Line((0, -40.1242552258), (0, -35.0442552258))
        make_face()
    extrude(amount=F8_T138_DEPTH)

    split(bisect_by=Plane(origin=(49.535616731, -20.6188846174, 0), x_dir=(0, 0, 1), z_dir=(0.9232155233, -0.384282575, 0)), keep=Keep.TOP)


with BuildPart() as f8_tool140:
    # F8_s141 → F8_t142 (new body)
    with BuildSketch(Plane(origin=(-3.6262487334, -8.7118421177, 0), x_dir=(0, 0, 1), z_dir=(0.384282575, 0.9232155233, 0))):
        with BuildLine():
            ThreePointArc((0, 58.7355283991), (1.4878975516, 55.1434259507), (5.08, 53.6555283991))
            Line((5.08, 53.6555283991), (0, 53.6555283991))
            Line((0, 53.6555283991), (0, 58.7355283991))
        make_face()
    extrude(amount=F8_T142_DEPTH)

    split(bisect_by=Plane(origin=(37.0433352869, 15.419052119, 0), x_dir=(0, 0, 1), z_dir=(-0.9232155233, -0.384282575, 0)), keep=Keep.TOP)


with BuildPart() as f8_tool136_1:
    add(f8_tool136.part)

    # F8_t144: intersect F8_tool140
    add(f8_tool140.part, mode=Mode.INTERSECT)


with BuildPart() as f1_17:
    add(f1_16.part)

    # F8_t134: cut F8_tool136
    add(f8_tool136_1.part, mode=Mode.SUBTRACT)


with BuildPart() as f8_tool147:
    # F8_s148 → F8_t149 (new body)
    with BuildSketch(Plane.YZ.offset(78.6068524837)):
        with BuildLine():
            ThreePointArc((23.7920139599, 0), (20.1999115115, 1.4878975516), (18.7120139599, 5.08))
            Line((18.7120139599, 5.08), (18.7120139599, 0))
            Line((18.7120139599, 0), (23.7920139599, 0))
        make_face()
    extrude(amount=-F8_T149_DEPTH)

    split(bisect_by=Plane(origin=(49.535616731, -20.6188846174, 0), x_dir=(0, 0, 1), z_dir=(0.9232155233, -0.384282575, 0)), keep=Keep.TOP)


with BuildPart() as f8_tool151:
    # F8_s152 → F8_t153 (new body)
    with BuildSketch(Plane(origin=(-3.6262487334, -8.7118421177, 0), x_dir=(0, 0, 1), z_dir=(0.384282575, 0.9232155233, 0))):
        with BuildLine():
            ThreePointArc((0, 58.7355283991), (1.4878975516, 55.1434259507), (5.08, 53.6555283991))
            Line((5.08, 53.6555283991), (0, 53.6555283991))
            Line((0, 53.6555283991), (0, 58.7355283991))
        make_face()
    extrude(amount=F8_T153_DEPTH)

    split(bisect_by=Plane.XZ.offset(-18.7120139599), keep=Keep.BOTTOM)


with BuildPart() as f8_tool147_1:
    add(f8_tool147.part)

    # F8_t155: intersect F8_tool151
    add(f8_tool151.part, mode=Mode.INTERSECT)


with BuildPart() as f1_18:
    add(f1_17.part)

    # F8_t145: cut F8_tool147
    add(f8_tool147_1.part, mode=Mode.SUBTRACT)


solid = f1_18.part
